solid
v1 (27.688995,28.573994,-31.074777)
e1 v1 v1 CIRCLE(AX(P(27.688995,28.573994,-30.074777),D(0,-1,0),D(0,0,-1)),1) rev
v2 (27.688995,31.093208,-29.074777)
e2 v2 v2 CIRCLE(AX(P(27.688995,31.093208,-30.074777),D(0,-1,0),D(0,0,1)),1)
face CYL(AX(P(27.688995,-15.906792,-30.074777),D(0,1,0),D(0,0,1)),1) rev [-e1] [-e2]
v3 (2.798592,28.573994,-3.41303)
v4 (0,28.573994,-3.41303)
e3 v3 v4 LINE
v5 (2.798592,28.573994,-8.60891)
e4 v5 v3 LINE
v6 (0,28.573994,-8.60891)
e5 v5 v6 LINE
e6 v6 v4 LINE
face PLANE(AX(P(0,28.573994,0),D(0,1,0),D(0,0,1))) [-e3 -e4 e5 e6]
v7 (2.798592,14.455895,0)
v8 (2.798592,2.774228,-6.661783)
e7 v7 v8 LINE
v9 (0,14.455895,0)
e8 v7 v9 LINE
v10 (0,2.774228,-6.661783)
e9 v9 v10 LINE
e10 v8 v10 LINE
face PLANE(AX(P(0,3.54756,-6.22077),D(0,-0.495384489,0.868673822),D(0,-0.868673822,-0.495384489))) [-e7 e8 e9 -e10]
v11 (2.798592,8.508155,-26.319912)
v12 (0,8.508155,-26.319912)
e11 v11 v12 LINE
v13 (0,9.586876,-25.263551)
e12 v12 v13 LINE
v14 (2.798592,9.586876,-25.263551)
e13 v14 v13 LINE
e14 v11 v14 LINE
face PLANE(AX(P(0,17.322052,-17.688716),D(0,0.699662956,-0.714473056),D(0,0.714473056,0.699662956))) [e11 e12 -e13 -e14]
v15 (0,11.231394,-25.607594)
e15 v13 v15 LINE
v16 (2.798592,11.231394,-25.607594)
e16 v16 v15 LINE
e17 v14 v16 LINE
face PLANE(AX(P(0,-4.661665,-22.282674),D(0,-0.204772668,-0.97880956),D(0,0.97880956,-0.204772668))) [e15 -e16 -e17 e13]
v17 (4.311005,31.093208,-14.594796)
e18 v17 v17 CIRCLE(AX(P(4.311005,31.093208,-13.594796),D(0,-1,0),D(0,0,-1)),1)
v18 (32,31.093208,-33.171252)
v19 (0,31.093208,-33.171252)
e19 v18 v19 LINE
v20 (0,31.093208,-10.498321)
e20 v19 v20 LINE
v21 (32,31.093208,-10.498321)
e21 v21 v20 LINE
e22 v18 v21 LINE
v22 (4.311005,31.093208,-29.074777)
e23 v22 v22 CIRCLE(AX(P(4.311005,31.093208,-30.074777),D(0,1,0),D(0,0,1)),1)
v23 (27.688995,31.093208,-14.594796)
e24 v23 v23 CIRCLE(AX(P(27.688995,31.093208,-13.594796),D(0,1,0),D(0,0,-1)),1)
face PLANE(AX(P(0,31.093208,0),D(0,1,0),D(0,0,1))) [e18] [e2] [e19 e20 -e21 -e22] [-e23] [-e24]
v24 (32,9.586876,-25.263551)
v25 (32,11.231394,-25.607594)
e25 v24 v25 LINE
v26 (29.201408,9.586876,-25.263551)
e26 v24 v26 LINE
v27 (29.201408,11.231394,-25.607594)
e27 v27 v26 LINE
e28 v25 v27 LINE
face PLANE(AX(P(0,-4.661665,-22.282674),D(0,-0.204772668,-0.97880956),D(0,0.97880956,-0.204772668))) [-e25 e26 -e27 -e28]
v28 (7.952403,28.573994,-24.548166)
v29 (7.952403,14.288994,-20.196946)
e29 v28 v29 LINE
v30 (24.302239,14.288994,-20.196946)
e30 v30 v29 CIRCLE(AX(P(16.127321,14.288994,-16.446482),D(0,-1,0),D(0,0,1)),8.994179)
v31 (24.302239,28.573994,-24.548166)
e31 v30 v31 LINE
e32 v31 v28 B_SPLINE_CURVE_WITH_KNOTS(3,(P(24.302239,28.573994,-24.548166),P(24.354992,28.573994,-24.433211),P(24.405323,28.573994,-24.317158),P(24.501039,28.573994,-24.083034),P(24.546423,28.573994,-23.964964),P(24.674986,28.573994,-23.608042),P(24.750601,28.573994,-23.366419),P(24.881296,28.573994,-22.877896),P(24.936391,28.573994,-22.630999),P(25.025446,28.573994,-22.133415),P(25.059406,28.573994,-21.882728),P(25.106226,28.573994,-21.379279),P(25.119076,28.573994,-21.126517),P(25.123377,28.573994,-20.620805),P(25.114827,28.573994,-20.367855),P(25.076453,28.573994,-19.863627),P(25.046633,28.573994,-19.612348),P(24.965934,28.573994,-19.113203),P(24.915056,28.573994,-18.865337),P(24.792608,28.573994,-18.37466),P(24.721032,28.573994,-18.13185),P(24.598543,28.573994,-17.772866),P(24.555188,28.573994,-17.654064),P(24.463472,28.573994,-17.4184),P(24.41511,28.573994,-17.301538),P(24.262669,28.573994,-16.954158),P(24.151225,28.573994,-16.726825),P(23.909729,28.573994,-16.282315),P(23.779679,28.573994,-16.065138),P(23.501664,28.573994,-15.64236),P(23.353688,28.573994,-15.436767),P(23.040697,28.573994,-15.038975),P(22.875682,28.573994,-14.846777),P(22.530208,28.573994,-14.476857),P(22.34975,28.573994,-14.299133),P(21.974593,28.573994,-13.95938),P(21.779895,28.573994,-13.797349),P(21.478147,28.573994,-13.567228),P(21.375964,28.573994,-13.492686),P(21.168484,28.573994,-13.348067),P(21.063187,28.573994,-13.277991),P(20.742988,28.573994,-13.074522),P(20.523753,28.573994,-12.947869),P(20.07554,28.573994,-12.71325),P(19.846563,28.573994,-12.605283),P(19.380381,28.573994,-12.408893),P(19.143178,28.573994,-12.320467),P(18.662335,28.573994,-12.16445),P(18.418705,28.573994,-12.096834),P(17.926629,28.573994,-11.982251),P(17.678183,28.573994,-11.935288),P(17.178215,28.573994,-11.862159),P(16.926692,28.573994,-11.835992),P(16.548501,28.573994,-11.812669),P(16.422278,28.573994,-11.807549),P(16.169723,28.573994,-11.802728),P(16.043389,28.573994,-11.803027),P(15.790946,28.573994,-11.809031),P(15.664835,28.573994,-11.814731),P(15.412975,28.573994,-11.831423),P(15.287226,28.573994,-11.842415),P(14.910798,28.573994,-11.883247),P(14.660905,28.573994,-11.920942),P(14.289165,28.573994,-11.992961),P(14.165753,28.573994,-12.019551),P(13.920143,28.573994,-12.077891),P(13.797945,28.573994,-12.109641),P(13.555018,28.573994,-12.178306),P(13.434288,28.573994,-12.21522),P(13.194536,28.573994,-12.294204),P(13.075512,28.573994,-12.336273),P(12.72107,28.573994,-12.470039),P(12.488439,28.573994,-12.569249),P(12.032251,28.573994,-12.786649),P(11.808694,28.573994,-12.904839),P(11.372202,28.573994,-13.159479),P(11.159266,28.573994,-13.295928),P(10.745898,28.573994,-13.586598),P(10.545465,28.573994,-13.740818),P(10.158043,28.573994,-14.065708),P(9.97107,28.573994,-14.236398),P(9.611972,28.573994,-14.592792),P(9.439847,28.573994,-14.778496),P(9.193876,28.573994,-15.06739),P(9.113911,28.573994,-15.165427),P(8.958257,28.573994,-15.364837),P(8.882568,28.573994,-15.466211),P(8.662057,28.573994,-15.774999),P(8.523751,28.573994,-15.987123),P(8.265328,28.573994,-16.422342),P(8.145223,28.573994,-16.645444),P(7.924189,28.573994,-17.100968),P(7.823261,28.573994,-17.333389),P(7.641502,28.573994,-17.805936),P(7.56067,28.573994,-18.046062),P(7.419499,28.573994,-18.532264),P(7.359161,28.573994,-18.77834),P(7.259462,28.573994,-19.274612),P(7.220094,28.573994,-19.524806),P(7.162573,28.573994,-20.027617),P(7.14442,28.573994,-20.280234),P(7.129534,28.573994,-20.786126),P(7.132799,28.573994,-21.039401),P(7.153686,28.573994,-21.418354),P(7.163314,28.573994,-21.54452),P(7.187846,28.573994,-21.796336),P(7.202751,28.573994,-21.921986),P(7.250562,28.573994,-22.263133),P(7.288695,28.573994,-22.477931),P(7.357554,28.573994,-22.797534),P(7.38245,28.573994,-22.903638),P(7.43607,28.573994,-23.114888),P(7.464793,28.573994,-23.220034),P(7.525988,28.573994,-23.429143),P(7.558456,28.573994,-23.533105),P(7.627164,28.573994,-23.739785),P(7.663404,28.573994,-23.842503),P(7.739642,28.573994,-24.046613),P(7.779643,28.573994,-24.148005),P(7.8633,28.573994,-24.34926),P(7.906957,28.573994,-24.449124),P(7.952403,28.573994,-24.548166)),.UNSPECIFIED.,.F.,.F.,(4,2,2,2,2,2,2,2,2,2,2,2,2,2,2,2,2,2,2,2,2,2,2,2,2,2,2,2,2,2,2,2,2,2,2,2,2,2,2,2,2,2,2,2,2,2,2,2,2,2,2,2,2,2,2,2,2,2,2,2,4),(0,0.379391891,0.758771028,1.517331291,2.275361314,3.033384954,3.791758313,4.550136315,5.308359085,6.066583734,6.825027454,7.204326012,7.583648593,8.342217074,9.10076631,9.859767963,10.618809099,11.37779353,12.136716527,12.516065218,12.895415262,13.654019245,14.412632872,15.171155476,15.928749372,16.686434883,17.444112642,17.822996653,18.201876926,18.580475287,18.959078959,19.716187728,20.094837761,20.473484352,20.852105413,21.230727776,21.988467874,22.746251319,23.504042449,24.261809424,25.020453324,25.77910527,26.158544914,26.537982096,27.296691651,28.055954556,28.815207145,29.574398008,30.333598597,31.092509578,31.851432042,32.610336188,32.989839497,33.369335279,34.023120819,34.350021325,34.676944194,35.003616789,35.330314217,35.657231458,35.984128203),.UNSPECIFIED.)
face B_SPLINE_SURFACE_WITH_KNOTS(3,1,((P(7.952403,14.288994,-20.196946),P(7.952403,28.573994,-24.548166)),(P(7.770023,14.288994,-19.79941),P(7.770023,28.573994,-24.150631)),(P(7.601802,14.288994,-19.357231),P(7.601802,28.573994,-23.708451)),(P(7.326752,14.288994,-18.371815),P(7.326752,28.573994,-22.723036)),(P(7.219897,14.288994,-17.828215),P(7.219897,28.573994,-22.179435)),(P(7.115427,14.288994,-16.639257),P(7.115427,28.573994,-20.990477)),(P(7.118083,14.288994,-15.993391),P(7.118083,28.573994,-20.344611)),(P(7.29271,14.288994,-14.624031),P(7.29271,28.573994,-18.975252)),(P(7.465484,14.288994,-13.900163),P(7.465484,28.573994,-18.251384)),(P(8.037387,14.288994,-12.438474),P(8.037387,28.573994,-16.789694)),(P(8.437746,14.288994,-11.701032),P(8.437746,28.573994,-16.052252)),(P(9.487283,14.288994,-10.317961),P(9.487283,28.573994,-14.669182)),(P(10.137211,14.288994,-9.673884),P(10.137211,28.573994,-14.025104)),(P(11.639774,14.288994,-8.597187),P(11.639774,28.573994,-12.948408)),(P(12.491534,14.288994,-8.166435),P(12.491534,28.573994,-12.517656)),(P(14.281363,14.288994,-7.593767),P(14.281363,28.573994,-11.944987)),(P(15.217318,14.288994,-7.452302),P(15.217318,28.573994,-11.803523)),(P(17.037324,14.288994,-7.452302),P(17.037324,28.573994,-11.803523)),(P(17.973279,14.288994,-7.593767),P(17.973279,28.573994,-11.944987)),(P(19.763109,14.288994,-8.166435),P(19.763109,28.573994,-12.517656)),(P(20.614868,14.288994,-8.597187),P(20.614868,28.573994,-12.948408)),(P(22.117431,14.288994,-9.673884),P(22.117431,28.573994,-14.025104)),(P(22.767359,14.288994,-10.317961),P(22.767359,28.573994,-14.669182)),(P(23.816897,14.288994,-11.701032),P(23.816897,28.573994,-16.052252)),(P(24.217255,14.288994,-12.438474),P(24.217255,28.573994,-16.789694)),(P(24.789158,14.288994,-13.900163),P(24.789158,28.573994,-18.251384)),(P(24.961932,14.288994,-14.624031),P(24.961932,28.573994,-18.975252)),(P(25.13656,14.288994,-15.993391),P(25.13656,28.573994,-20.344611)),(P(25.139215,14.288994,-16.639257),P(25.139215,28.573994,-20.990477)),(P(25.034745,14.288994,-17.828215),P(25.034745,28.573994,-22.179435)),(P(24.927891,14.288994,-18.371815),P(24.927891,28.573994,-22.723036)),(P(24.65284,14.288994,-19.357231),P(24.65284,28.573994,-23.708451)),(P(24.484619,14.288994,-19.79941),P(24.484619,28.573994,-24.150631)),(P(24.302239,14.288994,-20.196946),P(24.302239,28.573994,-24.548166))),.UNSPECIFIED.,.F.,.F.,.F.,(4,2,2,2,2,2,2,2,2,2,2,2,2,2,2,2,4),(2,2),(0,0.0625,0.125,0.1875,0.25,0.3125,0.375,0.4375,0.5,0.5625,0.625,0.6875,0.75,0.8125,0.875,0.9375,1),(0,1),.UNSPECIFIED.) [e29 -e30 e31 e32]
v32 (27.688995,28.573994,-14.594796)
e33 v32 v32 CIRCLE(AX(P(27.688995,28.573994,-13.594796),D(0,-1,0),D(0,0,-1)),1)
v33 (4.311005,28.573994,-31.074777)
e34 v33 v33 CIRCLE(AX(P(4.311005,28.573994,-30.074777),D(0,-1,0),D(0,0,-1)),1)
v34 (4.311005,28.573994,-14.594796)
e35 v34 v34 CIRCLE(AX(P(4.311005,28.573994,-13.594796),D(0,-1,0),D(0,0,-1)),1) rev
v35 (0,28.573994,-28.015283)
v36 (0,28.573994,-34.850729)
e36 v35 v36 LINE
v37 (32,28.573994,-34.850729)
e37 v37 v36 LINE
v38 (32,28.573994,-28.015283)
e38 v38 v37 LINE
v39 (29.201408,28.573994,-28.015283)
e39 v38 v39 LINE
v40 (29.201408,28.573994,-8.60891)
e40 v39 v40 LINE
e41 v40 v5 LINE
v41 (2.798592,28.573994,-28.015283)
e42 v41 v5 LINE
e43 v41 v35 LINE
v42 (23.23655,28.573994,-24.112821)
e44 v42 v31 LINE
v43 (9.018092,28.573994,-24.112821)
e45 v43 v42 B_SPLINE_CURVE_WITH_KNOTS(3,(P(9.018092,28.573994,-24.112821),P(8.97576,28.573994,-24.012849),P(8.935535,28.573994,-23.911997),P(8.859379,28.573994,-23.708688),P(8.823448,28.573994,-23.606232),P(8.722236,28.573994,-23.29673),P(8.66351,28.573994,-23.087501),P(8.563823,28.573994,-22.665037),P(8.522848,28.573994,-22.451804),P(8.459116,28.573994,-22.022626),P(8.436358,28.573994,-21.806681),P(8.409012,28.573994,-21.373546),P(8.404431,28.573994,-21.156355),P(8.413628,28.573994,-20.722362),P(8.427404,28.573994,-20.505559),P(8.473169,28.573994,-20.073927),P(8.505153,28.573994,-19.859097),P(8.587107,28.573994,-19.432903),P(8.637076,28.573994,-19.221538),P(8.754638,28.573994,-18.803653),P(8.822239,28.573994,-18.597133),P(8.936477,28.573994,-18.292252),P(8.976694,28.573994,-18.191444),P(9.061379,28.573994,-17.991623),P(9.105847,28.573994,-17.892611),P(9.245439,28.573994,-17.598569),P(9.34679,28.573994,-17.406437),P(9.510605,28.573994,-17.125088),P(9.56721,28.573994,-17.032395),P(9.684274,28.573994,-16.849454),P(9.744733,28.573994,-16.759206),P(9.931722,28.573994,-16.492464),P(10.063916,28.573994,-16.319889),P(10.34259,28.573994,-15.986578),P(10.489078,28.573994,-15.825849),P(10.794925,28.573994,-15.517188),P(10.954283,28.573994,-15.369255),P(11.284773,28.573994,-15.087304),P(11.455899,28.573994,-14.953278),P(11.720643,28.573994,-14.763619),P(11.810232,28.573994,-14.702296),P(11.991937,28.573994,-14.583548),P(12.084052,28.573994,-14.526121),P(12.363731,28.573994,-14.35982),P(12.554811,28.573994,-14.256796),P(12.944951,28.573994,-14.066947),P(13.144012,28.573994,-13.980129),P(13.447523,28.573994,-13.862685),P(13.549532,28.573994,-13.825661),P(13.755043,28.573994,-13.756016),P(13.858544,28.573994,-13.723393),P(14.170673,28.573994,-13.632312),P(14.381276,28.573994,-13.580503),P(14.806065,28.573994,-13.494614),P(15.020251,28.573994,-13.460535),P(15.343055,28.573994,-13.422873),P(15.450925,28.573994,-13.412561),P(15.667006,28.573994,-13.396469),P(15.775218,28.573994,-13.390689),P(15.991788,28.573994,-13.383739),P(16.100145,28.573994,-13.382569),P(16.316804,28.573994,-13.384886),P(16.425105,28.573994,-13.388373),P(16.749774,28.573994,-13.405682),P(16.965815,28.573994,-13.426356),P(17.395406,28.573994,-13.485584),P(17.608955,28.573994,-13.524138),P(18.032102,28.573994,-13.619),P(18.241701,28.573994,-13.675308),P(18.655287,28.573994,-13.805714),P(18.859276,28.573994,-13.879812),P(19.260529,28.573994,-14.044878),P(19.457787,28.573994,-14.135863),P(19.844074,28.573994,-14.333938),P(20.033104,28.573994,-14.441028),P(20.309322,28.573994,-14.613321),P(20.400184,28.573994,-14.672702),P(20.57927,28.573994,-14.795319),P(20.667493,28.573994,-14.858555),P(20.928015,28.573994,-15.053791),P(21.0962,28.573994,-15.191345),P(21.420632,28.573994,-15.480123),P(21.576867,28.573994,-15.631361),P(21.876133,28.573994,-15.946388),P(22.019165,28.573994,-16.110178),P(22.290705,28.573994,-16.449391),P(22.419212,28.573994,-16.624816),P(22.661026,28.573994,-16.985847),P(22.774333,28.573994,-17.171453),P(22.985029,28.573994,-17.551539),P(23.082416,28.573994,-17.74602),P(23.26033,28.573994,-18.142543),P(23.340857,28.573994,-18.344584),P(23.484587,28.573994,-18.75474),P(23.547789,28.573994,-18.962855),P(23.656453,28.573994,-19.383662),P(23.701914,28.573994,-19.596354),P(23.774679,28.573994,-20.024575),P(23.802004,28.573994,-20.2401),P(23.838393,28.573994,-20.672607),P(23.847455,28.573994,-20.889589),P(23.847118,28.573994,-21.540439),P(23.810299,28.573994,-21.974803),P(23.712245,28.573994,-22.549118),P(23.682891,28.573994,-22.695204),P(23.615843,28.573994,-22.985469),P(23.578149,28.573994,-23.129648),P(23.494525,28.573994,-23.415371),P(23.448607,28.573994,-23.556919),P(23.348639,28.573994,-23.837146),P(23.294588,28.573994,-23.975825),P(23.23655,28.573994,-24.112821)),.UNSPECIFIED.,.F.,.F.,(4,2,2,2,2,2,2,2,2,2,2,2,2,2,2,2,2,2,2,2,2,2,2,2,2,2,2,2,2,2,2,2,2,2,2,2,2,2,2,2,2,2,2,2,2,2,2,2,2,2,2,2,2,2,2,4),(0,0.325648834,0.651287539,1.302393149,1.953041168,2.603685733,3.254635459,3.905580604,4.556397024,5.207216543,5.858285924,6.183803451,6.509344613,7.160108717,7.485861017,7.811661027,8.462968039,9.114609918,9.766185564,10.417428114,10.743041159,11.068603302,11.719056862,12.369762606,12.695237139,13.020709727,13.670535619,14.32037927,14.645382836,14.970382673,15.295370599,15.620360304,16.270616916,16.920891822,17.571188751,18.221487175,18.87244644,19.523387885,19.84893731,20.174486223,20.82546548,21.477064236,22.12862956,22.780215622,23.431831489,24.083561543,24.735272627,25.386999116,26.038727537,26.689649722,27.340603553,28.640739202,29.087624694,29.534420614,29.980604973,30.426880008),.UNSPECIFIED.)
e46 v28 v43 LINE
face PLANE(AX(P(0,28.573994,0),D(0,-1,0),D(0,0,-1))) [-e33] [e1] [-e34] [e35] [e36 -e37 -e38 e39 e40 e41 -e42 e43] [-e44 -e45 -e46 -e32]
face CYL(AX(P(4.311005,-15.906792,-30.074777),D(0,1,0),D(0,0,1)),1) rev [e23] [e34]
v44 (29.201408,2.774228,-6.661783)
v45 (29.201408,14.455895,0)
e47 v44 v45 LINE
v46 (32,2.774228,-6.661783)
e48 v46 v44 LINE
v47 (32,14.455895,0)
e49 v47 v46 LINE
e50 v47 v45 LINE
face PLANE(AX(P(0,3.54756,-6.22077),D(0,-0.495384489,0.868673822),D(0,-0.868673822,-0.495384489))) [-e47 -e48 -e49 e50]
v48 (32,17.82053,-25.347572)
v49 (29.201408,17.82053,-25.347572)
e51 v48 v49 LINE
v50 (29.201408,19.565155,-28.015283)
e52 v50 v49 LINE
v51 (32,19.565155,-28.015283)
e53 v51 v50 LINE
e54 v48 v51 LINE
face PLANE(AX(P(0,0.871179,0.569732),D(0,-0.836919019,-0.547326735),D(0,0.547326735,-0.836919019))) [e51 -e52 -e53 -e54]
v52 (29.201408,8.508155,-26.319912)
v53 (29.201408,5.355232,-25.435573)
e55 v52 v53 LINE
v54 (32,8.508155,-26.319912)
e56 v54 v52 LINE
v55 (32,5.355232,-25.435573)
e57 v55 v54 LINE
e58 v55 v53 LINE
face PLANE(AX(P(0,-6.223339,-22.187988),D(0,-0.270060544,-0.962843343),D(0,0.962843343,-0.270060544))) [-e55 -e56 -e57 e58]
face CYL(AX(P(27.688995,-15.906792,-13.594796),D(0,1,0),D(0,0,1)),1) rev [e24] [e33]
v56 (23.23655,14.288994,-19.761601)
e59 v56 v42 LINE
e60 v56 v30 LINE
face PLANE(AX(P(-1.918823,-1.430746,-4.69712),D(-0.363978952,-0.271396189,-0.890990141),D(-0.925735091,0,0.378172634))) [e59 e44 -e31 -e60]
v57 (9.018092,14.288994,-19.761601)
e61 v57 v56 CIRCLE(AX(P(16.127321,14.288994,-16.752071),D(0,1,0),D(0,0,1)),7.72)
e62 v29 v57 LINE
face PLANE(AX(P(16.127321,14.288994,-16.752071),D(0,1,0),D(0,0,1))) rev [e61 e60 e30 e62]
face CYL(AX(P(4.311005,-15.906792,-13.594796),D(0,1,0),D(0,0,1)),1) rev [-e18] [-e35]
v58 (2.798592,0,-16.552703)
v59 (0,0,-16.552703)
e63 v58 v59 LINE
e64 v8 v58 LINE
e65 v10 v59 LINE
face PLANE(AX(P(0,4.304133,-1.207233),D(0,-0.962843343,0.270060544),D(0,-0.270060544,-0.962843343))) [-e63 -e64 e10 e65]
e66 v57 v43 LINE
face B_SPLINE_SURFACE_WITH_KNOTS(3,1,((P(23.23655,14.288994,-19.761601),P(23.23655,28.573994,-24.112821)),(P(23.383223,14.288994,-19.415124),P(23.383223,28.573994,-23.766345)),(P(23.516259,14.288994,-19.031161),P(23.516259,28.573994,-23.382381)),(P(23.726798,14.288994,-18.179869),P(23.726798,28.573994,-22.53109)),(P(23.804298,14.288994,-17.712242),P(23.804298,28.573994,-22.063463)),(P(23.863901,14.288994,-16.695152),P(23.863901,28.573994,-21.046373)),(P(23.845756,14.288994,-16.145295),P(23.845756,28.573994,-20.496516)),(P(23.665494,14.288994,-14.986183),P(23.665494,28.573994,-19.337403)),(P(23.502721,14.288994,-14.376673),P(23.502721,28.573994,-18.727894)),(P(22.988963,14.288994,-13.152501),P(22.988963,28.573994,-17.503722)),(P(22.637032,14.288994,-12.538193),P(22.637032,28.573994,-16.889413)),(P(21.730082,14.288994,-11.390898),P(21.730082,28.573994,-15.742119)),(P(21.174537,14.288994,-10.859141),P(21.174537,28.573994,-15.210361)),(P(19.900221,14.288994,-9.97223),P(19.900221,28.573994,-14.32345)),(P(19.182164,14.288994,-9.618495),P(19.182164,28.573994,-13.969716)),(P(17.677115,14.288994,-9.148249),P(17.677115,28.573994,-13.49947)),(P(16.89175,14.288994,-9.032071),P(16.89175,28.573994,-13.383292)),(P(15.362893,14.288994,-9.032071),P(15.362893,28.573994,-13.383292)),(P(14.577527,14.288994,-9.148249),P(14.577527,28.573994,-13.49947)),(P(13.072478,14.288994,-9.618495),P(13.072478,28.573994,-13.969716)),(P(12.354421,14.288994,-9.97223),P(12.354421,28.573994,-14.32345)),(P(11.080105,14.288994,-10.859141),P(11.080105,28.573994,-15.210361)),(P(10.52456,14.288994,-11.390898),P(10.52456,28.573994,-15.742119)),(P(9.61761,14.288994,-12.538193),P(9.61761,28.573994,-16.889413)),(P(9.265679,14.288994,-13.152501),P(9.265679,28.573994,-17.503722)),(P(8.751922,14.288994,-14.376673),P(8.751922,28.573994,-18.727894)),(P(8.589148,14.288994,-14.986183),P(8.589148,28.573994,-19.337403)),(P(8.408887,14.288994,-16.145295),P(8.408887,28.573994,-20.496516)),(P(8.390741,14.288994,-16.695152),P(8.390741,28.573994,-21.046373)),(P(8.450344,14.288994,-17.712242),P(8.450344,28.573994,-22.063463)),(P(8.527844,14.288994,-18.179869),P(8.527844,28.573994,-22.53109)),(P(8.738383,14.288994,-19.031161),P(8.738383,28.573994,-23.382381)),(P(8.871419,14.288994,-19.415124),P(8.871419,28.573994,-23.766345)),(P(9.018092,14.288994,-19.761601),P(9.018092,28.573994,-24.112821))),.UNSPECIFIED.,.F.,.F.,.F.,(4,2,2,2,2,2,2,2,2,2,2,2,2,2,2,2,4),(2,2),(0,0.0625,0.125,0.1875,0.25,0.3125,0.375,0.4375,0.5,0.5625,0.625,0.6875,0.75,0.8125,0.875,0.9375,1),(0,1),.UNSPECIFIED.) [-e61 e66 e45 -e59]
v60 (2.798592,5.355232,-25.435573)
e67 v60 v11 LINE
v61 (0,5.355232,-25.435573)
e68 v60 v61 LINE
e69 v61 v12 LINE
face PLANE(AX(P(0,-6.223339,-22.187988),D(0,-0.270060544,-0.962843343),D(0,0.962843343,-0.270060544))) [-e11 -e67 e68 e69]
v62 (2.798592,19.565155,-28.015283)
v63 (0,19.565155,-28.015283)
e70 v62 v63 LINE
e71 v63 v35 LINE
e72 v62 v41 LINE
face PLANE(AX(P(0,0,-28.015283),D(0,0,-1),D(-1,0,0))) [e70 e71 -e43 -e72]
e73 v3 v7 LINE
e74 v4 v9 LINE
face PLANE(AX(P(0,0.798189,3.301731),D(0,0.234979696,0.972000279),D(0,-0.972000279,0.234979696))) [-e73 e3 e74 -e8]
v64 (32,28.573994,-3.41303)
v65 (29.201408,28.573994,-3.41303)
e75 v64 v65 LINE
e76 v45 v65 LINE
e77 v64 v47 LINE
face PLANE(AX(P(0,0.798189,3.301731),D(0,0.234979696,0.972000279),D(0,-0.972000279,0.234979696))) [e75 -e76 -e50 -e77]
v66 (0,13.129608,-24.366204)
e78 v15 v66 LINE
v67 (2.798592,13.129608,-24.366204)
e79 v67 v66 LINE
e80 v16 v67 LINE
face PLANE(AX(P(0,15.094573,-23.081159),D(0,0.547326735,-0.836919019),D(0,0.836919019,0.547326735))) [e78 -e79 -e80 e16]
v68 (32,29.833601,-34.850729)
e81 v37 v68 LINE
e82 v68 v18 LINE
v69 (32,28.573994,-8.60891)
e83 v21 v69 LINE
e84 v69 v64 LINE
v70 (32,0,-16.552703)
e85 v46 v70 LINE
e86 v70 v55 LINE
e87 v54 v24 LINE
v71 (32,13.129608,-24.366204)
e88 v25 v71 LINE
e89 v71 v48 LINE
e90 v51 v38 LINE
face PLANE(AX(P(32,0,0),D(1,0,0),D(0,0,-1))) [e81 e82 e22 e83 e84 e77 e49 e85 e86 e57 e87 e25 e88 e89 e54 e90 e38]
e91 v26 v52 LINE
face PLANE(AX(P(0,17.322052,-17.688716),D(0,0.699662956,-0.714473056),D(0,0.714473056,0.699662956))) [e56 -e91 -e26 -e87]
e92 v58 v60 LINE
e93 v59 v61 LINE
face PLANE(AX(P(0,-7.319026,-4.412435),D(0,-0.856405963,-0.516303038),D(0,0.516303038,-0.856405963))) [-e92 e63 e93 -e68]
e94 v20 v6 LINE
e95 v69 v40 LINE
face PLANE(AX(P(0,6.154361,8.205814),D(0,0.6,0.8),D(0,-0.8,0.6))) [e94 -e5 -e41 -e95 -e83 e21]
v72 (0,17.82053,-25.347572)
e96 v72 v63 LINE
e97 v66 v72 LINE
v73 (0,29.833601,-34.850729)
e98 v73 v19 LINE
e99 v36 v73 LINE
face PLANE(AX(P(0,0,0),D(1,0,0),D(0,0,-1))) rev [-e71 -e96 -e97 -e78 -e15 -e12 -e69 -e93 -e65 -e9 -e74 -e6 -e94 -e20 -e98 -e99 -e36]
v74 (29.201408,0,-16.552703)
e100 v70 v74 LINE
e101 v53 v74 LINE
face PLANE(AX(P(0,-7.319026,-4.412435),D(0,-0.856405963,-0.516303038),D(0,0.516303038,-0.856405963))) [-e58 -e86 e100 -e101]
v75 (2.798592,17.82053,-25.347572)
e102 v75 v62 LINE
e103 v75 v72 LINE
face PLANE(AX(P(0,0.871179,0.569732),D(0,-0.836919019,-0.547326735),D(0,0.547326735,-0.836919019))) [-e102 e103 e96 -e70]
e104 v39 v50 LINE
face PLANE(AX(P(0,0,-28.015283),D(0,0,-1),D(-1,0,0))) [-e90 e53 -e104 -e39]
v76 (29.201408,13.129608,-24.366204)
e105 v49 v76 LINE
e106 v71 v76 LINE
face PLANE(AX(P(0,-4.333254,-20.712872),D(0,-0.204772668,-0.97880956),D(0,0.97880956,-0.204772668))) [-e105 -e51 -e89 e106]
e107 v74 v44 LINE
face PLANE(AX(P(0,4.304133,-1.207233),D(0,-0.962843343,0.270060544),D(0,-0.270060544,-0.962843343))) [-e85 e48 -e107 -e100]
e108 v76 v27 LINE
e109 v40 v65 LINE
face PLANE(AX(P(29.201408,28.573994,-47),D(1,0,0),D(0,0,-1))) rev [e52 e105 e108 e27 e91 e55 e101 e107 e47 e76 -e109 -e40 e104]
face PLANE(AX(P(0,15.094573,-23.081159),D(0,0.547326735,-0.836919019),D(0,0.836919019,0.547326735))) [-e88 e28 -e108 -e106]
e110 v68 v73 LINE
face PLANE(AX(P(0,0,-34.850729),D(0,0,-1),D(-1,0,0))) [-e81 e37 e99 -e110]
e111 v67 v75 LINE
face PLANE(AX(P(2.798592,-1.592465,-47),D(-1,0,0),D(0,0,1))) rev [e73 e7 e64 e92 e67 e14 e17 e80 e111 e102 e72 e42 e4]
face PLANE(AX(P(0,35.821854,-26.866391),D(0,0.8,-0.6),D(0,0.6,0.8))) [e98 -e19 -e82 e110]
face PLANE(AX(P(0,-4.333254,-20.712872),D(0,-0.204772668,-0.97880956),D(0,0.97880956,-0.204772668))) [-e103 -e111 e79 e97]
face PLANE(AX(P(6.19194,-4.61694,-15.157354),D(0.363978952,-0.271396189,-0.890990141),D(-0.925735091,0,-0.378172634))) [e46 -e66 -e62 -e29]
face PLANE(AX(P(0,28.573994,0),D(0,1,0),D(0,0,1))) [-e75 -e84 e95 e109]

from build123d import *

# Parameters (mm, degrees)
SKETCH3_W               = 26.402815354
SKETCH3_H               = 30.166458461
CUT_EXTRUDE1_DEPTH      = 47
SKETCH4_R               = 1
CUT_EXTRUDE3_DEPTH      = 47
MIRROR4_COPY_1_SKETCH_R = 1
MIRROR4_COPY_1_DEPTH    = 47


with BuildPart() as part:
    # Sketch2 → Loft1 section 0
    with BuildSketch(Plane(origin=(32, 0, 0), x_dir=(0, 0, -1), z_dir=(1, 0, 0))):
        with BuildLine():
            Line((0, 14.455895325), (3.413030344, 28.573993623))
            Line((3.413030344, 28.573993623), (8.608910386, 28.573993623))
            Line((8.608910386, 28.573993623), (10.498321311, 31.093208189))
            Line((10.498321311, 31.093208189), (33.171252407, 31.093208189))
            Line((33.171252407, 31.093208189), (34.850728784, 29.833600906))
            Line((34.850728784, 29.833600906), (34.850728784, 28.573993623))
            Line((34.850728784, 28.573993623), (28.015283486, 28.573993623))
            Line((28.015283486, 28.573993623), (28.015283486, 19.565154633))
            Line((28.015283486, 19.565154633), (25.347572315, 17.820529869))
            Line((25.347572315, 17.820529869), (24.366204042, 13.129607698))
            Line((24.366204042, 13.129607698), (25.607594247, 11.231394061))
            Line((25.607594247, 11.231394061), (25.263551475, 9.586875986))
            Line((25.263551475, 9.586875986), (26.31991204, 8.508154932))
            Line((26.31991204, 8.508154932), (25.435572861, 5.355231962))
            Line((25.435572861, 5.355231962), (16.552703214, 0))
            Line((16.552703214, 0), (6.661783172, 2.774228292))
            Line((6.661783172, 2.774228292), (0, 14.455895325))
        make_face()
    # Sketch1 → Loft1 section 1
    with BuildSketch(Plane(origin=(0, 0, 0), x_dir=(0, 0, -1), z_dir=(1, 0, 0))):
        with BuildLine():
            Line((0, 14.455895325), (3.413030344, 28.573993623))
            Line((3.413030344, 28.573993623), (8.608910386, 28.573993623))
            Line((8.608910386, 28.573993623), (10.498321311, 31.093208189))
            Line((10.498321311, 31.093208189), (33.171252407, 31.093208189))
            Line((33.171252407, 31.093208189), (34.850728784, 29.833600906))
            Line((34.850728784, 29.833600906), (34.850728784, 28.573993623))
            Line((34.850728784, 28.573993623), (28.015283486, 28.573993623))
            Line((28.015283486, 28.573993623), (28.015283486, 19.565154633))
            Line((28.015283486, 19.565154633), (25.347572315, 17.820529869))
            Line((25.347572315, 17.820529869), (24.366204042, 13.129607698))
            Line((24.366204042, 13.129607698), (25.607594247, 11.231394061))
            Line((25.607594247, 11.231394061), (25.263551475, 9.586875986))
            Line((25.263551475, 9.586875986), (26.31991204, 8.508154932))
            Line((26.31991204, 8.508154932), (25.435572861, 5.355231962))
            Line((25.435572861, 5.355231962), (16.552703214, 0))
            Line((16.552703214, 0), (6.661783172, 2.774228292))
            Line((6.661783172, 2.774228292), (0, 14.455895325))
        make_face()
    loft()

    # Sketch3 → Cut-Extrude1 (cut)
    with BuildSketch(Plane.XY):
        with Locations((16, 13.490764393)):
            Rectangle(SKETCH3_W, SKETCH3_H)
    extrude(amount=-CUT_EXTRUDE1_DEPTH, mode=Mode.SUBTRACT)

    # Sketch4 → Cut-Extrude3 (cut)
    with BuildSketch(Plane(origin=(0, 31.093208189, 0), x_dir=(1, 0, 0), z_dir=(0, 1, 0))):
        with Locations((4.311005364, 30.074777425)):
            Circle(SKETCH4_R)
    cut_extrude3 = extrude(amount=-CUT_EXTRUDE3_DEPTH, mode=Mode.SUBTRACT)

    # Mirror3: Cut-Extrude3 across plane
    add(cut_extrude3.mirror(Plane(origin=(16, 0, 0), x_dir=(0, 0, 1), z_dir=(1, 0, 0))), mode=Mode.SUBTRACT)

    # Mirror4: Cut-Extrude3 across plane
    add(cut_extrude3.mirror(Plane.XY.offset(-21.834786859)), mode=Mode.SUBTRACT)

    # Mirror4 copy 1 sketch → Mirror4 copy 1 (cut)
    with BuildSketch(Plane(origin=(32, 31.093208189, -43.669573718), x_dir=(-1, 0, 0), z_dir=(0, 1, 0))):
        with Locations((4.311005364, 30.074777425)):
            Circle(MIRROR4_COPY_1_SKETCH_R)
    extrude(amount=-MIRROR4_COPY_1_DEPTH, mode=Mode.SUBTRACT)

    # Sketch6 → Loft2 section 0
    with BuildSketch(Plane(origin=(0, 14.288993623, 0), x_dir=(-1, 0, 0), z_dir=(0, -1, 0))):
        with BuildLine():
            Line((-9.018092228, 19.761600579), (-7.95240346, 20.196945779))
            ThreePointArc((-7.95240346, 20.196945779), (-16.127321048, 7.452302301), (-24.302238636, 20.196945779))
            Line((-24.302238636, 20.196945779), (-23.236549868, 19.761600579))
            ThreePointArc((-23.236549868, 19.761600579), (-16.127321048, 9.032071449), (-9.018092228, 19.761600579))
        make_face()
    # Sketch5 → Loft2 section 1
    with BuildSketch(Plane(origin=(0, 28.573993623, 0), x_dir=(-1, 0, 0), z_dir=(0, -1, 0))):
        with BuildLine():
            Line((-9.018092228, 24.112821073), (-7.95240346, 24.548166273))
            ThreePointArc((-7.95240346, 24.548166273), (-16.127321048, 11.803522795), (-24.302238636, 24.548166273))
            Line((-24.302238636, 24.548166273), (-23.236549868, 24.112821073))
            ThreePointArc((-23.236549868, 24.112821073), (-16.127321048, 13.383291944), (-9.018092228, 24.112821073))
        make_face()
    loft()


solid = part.part
